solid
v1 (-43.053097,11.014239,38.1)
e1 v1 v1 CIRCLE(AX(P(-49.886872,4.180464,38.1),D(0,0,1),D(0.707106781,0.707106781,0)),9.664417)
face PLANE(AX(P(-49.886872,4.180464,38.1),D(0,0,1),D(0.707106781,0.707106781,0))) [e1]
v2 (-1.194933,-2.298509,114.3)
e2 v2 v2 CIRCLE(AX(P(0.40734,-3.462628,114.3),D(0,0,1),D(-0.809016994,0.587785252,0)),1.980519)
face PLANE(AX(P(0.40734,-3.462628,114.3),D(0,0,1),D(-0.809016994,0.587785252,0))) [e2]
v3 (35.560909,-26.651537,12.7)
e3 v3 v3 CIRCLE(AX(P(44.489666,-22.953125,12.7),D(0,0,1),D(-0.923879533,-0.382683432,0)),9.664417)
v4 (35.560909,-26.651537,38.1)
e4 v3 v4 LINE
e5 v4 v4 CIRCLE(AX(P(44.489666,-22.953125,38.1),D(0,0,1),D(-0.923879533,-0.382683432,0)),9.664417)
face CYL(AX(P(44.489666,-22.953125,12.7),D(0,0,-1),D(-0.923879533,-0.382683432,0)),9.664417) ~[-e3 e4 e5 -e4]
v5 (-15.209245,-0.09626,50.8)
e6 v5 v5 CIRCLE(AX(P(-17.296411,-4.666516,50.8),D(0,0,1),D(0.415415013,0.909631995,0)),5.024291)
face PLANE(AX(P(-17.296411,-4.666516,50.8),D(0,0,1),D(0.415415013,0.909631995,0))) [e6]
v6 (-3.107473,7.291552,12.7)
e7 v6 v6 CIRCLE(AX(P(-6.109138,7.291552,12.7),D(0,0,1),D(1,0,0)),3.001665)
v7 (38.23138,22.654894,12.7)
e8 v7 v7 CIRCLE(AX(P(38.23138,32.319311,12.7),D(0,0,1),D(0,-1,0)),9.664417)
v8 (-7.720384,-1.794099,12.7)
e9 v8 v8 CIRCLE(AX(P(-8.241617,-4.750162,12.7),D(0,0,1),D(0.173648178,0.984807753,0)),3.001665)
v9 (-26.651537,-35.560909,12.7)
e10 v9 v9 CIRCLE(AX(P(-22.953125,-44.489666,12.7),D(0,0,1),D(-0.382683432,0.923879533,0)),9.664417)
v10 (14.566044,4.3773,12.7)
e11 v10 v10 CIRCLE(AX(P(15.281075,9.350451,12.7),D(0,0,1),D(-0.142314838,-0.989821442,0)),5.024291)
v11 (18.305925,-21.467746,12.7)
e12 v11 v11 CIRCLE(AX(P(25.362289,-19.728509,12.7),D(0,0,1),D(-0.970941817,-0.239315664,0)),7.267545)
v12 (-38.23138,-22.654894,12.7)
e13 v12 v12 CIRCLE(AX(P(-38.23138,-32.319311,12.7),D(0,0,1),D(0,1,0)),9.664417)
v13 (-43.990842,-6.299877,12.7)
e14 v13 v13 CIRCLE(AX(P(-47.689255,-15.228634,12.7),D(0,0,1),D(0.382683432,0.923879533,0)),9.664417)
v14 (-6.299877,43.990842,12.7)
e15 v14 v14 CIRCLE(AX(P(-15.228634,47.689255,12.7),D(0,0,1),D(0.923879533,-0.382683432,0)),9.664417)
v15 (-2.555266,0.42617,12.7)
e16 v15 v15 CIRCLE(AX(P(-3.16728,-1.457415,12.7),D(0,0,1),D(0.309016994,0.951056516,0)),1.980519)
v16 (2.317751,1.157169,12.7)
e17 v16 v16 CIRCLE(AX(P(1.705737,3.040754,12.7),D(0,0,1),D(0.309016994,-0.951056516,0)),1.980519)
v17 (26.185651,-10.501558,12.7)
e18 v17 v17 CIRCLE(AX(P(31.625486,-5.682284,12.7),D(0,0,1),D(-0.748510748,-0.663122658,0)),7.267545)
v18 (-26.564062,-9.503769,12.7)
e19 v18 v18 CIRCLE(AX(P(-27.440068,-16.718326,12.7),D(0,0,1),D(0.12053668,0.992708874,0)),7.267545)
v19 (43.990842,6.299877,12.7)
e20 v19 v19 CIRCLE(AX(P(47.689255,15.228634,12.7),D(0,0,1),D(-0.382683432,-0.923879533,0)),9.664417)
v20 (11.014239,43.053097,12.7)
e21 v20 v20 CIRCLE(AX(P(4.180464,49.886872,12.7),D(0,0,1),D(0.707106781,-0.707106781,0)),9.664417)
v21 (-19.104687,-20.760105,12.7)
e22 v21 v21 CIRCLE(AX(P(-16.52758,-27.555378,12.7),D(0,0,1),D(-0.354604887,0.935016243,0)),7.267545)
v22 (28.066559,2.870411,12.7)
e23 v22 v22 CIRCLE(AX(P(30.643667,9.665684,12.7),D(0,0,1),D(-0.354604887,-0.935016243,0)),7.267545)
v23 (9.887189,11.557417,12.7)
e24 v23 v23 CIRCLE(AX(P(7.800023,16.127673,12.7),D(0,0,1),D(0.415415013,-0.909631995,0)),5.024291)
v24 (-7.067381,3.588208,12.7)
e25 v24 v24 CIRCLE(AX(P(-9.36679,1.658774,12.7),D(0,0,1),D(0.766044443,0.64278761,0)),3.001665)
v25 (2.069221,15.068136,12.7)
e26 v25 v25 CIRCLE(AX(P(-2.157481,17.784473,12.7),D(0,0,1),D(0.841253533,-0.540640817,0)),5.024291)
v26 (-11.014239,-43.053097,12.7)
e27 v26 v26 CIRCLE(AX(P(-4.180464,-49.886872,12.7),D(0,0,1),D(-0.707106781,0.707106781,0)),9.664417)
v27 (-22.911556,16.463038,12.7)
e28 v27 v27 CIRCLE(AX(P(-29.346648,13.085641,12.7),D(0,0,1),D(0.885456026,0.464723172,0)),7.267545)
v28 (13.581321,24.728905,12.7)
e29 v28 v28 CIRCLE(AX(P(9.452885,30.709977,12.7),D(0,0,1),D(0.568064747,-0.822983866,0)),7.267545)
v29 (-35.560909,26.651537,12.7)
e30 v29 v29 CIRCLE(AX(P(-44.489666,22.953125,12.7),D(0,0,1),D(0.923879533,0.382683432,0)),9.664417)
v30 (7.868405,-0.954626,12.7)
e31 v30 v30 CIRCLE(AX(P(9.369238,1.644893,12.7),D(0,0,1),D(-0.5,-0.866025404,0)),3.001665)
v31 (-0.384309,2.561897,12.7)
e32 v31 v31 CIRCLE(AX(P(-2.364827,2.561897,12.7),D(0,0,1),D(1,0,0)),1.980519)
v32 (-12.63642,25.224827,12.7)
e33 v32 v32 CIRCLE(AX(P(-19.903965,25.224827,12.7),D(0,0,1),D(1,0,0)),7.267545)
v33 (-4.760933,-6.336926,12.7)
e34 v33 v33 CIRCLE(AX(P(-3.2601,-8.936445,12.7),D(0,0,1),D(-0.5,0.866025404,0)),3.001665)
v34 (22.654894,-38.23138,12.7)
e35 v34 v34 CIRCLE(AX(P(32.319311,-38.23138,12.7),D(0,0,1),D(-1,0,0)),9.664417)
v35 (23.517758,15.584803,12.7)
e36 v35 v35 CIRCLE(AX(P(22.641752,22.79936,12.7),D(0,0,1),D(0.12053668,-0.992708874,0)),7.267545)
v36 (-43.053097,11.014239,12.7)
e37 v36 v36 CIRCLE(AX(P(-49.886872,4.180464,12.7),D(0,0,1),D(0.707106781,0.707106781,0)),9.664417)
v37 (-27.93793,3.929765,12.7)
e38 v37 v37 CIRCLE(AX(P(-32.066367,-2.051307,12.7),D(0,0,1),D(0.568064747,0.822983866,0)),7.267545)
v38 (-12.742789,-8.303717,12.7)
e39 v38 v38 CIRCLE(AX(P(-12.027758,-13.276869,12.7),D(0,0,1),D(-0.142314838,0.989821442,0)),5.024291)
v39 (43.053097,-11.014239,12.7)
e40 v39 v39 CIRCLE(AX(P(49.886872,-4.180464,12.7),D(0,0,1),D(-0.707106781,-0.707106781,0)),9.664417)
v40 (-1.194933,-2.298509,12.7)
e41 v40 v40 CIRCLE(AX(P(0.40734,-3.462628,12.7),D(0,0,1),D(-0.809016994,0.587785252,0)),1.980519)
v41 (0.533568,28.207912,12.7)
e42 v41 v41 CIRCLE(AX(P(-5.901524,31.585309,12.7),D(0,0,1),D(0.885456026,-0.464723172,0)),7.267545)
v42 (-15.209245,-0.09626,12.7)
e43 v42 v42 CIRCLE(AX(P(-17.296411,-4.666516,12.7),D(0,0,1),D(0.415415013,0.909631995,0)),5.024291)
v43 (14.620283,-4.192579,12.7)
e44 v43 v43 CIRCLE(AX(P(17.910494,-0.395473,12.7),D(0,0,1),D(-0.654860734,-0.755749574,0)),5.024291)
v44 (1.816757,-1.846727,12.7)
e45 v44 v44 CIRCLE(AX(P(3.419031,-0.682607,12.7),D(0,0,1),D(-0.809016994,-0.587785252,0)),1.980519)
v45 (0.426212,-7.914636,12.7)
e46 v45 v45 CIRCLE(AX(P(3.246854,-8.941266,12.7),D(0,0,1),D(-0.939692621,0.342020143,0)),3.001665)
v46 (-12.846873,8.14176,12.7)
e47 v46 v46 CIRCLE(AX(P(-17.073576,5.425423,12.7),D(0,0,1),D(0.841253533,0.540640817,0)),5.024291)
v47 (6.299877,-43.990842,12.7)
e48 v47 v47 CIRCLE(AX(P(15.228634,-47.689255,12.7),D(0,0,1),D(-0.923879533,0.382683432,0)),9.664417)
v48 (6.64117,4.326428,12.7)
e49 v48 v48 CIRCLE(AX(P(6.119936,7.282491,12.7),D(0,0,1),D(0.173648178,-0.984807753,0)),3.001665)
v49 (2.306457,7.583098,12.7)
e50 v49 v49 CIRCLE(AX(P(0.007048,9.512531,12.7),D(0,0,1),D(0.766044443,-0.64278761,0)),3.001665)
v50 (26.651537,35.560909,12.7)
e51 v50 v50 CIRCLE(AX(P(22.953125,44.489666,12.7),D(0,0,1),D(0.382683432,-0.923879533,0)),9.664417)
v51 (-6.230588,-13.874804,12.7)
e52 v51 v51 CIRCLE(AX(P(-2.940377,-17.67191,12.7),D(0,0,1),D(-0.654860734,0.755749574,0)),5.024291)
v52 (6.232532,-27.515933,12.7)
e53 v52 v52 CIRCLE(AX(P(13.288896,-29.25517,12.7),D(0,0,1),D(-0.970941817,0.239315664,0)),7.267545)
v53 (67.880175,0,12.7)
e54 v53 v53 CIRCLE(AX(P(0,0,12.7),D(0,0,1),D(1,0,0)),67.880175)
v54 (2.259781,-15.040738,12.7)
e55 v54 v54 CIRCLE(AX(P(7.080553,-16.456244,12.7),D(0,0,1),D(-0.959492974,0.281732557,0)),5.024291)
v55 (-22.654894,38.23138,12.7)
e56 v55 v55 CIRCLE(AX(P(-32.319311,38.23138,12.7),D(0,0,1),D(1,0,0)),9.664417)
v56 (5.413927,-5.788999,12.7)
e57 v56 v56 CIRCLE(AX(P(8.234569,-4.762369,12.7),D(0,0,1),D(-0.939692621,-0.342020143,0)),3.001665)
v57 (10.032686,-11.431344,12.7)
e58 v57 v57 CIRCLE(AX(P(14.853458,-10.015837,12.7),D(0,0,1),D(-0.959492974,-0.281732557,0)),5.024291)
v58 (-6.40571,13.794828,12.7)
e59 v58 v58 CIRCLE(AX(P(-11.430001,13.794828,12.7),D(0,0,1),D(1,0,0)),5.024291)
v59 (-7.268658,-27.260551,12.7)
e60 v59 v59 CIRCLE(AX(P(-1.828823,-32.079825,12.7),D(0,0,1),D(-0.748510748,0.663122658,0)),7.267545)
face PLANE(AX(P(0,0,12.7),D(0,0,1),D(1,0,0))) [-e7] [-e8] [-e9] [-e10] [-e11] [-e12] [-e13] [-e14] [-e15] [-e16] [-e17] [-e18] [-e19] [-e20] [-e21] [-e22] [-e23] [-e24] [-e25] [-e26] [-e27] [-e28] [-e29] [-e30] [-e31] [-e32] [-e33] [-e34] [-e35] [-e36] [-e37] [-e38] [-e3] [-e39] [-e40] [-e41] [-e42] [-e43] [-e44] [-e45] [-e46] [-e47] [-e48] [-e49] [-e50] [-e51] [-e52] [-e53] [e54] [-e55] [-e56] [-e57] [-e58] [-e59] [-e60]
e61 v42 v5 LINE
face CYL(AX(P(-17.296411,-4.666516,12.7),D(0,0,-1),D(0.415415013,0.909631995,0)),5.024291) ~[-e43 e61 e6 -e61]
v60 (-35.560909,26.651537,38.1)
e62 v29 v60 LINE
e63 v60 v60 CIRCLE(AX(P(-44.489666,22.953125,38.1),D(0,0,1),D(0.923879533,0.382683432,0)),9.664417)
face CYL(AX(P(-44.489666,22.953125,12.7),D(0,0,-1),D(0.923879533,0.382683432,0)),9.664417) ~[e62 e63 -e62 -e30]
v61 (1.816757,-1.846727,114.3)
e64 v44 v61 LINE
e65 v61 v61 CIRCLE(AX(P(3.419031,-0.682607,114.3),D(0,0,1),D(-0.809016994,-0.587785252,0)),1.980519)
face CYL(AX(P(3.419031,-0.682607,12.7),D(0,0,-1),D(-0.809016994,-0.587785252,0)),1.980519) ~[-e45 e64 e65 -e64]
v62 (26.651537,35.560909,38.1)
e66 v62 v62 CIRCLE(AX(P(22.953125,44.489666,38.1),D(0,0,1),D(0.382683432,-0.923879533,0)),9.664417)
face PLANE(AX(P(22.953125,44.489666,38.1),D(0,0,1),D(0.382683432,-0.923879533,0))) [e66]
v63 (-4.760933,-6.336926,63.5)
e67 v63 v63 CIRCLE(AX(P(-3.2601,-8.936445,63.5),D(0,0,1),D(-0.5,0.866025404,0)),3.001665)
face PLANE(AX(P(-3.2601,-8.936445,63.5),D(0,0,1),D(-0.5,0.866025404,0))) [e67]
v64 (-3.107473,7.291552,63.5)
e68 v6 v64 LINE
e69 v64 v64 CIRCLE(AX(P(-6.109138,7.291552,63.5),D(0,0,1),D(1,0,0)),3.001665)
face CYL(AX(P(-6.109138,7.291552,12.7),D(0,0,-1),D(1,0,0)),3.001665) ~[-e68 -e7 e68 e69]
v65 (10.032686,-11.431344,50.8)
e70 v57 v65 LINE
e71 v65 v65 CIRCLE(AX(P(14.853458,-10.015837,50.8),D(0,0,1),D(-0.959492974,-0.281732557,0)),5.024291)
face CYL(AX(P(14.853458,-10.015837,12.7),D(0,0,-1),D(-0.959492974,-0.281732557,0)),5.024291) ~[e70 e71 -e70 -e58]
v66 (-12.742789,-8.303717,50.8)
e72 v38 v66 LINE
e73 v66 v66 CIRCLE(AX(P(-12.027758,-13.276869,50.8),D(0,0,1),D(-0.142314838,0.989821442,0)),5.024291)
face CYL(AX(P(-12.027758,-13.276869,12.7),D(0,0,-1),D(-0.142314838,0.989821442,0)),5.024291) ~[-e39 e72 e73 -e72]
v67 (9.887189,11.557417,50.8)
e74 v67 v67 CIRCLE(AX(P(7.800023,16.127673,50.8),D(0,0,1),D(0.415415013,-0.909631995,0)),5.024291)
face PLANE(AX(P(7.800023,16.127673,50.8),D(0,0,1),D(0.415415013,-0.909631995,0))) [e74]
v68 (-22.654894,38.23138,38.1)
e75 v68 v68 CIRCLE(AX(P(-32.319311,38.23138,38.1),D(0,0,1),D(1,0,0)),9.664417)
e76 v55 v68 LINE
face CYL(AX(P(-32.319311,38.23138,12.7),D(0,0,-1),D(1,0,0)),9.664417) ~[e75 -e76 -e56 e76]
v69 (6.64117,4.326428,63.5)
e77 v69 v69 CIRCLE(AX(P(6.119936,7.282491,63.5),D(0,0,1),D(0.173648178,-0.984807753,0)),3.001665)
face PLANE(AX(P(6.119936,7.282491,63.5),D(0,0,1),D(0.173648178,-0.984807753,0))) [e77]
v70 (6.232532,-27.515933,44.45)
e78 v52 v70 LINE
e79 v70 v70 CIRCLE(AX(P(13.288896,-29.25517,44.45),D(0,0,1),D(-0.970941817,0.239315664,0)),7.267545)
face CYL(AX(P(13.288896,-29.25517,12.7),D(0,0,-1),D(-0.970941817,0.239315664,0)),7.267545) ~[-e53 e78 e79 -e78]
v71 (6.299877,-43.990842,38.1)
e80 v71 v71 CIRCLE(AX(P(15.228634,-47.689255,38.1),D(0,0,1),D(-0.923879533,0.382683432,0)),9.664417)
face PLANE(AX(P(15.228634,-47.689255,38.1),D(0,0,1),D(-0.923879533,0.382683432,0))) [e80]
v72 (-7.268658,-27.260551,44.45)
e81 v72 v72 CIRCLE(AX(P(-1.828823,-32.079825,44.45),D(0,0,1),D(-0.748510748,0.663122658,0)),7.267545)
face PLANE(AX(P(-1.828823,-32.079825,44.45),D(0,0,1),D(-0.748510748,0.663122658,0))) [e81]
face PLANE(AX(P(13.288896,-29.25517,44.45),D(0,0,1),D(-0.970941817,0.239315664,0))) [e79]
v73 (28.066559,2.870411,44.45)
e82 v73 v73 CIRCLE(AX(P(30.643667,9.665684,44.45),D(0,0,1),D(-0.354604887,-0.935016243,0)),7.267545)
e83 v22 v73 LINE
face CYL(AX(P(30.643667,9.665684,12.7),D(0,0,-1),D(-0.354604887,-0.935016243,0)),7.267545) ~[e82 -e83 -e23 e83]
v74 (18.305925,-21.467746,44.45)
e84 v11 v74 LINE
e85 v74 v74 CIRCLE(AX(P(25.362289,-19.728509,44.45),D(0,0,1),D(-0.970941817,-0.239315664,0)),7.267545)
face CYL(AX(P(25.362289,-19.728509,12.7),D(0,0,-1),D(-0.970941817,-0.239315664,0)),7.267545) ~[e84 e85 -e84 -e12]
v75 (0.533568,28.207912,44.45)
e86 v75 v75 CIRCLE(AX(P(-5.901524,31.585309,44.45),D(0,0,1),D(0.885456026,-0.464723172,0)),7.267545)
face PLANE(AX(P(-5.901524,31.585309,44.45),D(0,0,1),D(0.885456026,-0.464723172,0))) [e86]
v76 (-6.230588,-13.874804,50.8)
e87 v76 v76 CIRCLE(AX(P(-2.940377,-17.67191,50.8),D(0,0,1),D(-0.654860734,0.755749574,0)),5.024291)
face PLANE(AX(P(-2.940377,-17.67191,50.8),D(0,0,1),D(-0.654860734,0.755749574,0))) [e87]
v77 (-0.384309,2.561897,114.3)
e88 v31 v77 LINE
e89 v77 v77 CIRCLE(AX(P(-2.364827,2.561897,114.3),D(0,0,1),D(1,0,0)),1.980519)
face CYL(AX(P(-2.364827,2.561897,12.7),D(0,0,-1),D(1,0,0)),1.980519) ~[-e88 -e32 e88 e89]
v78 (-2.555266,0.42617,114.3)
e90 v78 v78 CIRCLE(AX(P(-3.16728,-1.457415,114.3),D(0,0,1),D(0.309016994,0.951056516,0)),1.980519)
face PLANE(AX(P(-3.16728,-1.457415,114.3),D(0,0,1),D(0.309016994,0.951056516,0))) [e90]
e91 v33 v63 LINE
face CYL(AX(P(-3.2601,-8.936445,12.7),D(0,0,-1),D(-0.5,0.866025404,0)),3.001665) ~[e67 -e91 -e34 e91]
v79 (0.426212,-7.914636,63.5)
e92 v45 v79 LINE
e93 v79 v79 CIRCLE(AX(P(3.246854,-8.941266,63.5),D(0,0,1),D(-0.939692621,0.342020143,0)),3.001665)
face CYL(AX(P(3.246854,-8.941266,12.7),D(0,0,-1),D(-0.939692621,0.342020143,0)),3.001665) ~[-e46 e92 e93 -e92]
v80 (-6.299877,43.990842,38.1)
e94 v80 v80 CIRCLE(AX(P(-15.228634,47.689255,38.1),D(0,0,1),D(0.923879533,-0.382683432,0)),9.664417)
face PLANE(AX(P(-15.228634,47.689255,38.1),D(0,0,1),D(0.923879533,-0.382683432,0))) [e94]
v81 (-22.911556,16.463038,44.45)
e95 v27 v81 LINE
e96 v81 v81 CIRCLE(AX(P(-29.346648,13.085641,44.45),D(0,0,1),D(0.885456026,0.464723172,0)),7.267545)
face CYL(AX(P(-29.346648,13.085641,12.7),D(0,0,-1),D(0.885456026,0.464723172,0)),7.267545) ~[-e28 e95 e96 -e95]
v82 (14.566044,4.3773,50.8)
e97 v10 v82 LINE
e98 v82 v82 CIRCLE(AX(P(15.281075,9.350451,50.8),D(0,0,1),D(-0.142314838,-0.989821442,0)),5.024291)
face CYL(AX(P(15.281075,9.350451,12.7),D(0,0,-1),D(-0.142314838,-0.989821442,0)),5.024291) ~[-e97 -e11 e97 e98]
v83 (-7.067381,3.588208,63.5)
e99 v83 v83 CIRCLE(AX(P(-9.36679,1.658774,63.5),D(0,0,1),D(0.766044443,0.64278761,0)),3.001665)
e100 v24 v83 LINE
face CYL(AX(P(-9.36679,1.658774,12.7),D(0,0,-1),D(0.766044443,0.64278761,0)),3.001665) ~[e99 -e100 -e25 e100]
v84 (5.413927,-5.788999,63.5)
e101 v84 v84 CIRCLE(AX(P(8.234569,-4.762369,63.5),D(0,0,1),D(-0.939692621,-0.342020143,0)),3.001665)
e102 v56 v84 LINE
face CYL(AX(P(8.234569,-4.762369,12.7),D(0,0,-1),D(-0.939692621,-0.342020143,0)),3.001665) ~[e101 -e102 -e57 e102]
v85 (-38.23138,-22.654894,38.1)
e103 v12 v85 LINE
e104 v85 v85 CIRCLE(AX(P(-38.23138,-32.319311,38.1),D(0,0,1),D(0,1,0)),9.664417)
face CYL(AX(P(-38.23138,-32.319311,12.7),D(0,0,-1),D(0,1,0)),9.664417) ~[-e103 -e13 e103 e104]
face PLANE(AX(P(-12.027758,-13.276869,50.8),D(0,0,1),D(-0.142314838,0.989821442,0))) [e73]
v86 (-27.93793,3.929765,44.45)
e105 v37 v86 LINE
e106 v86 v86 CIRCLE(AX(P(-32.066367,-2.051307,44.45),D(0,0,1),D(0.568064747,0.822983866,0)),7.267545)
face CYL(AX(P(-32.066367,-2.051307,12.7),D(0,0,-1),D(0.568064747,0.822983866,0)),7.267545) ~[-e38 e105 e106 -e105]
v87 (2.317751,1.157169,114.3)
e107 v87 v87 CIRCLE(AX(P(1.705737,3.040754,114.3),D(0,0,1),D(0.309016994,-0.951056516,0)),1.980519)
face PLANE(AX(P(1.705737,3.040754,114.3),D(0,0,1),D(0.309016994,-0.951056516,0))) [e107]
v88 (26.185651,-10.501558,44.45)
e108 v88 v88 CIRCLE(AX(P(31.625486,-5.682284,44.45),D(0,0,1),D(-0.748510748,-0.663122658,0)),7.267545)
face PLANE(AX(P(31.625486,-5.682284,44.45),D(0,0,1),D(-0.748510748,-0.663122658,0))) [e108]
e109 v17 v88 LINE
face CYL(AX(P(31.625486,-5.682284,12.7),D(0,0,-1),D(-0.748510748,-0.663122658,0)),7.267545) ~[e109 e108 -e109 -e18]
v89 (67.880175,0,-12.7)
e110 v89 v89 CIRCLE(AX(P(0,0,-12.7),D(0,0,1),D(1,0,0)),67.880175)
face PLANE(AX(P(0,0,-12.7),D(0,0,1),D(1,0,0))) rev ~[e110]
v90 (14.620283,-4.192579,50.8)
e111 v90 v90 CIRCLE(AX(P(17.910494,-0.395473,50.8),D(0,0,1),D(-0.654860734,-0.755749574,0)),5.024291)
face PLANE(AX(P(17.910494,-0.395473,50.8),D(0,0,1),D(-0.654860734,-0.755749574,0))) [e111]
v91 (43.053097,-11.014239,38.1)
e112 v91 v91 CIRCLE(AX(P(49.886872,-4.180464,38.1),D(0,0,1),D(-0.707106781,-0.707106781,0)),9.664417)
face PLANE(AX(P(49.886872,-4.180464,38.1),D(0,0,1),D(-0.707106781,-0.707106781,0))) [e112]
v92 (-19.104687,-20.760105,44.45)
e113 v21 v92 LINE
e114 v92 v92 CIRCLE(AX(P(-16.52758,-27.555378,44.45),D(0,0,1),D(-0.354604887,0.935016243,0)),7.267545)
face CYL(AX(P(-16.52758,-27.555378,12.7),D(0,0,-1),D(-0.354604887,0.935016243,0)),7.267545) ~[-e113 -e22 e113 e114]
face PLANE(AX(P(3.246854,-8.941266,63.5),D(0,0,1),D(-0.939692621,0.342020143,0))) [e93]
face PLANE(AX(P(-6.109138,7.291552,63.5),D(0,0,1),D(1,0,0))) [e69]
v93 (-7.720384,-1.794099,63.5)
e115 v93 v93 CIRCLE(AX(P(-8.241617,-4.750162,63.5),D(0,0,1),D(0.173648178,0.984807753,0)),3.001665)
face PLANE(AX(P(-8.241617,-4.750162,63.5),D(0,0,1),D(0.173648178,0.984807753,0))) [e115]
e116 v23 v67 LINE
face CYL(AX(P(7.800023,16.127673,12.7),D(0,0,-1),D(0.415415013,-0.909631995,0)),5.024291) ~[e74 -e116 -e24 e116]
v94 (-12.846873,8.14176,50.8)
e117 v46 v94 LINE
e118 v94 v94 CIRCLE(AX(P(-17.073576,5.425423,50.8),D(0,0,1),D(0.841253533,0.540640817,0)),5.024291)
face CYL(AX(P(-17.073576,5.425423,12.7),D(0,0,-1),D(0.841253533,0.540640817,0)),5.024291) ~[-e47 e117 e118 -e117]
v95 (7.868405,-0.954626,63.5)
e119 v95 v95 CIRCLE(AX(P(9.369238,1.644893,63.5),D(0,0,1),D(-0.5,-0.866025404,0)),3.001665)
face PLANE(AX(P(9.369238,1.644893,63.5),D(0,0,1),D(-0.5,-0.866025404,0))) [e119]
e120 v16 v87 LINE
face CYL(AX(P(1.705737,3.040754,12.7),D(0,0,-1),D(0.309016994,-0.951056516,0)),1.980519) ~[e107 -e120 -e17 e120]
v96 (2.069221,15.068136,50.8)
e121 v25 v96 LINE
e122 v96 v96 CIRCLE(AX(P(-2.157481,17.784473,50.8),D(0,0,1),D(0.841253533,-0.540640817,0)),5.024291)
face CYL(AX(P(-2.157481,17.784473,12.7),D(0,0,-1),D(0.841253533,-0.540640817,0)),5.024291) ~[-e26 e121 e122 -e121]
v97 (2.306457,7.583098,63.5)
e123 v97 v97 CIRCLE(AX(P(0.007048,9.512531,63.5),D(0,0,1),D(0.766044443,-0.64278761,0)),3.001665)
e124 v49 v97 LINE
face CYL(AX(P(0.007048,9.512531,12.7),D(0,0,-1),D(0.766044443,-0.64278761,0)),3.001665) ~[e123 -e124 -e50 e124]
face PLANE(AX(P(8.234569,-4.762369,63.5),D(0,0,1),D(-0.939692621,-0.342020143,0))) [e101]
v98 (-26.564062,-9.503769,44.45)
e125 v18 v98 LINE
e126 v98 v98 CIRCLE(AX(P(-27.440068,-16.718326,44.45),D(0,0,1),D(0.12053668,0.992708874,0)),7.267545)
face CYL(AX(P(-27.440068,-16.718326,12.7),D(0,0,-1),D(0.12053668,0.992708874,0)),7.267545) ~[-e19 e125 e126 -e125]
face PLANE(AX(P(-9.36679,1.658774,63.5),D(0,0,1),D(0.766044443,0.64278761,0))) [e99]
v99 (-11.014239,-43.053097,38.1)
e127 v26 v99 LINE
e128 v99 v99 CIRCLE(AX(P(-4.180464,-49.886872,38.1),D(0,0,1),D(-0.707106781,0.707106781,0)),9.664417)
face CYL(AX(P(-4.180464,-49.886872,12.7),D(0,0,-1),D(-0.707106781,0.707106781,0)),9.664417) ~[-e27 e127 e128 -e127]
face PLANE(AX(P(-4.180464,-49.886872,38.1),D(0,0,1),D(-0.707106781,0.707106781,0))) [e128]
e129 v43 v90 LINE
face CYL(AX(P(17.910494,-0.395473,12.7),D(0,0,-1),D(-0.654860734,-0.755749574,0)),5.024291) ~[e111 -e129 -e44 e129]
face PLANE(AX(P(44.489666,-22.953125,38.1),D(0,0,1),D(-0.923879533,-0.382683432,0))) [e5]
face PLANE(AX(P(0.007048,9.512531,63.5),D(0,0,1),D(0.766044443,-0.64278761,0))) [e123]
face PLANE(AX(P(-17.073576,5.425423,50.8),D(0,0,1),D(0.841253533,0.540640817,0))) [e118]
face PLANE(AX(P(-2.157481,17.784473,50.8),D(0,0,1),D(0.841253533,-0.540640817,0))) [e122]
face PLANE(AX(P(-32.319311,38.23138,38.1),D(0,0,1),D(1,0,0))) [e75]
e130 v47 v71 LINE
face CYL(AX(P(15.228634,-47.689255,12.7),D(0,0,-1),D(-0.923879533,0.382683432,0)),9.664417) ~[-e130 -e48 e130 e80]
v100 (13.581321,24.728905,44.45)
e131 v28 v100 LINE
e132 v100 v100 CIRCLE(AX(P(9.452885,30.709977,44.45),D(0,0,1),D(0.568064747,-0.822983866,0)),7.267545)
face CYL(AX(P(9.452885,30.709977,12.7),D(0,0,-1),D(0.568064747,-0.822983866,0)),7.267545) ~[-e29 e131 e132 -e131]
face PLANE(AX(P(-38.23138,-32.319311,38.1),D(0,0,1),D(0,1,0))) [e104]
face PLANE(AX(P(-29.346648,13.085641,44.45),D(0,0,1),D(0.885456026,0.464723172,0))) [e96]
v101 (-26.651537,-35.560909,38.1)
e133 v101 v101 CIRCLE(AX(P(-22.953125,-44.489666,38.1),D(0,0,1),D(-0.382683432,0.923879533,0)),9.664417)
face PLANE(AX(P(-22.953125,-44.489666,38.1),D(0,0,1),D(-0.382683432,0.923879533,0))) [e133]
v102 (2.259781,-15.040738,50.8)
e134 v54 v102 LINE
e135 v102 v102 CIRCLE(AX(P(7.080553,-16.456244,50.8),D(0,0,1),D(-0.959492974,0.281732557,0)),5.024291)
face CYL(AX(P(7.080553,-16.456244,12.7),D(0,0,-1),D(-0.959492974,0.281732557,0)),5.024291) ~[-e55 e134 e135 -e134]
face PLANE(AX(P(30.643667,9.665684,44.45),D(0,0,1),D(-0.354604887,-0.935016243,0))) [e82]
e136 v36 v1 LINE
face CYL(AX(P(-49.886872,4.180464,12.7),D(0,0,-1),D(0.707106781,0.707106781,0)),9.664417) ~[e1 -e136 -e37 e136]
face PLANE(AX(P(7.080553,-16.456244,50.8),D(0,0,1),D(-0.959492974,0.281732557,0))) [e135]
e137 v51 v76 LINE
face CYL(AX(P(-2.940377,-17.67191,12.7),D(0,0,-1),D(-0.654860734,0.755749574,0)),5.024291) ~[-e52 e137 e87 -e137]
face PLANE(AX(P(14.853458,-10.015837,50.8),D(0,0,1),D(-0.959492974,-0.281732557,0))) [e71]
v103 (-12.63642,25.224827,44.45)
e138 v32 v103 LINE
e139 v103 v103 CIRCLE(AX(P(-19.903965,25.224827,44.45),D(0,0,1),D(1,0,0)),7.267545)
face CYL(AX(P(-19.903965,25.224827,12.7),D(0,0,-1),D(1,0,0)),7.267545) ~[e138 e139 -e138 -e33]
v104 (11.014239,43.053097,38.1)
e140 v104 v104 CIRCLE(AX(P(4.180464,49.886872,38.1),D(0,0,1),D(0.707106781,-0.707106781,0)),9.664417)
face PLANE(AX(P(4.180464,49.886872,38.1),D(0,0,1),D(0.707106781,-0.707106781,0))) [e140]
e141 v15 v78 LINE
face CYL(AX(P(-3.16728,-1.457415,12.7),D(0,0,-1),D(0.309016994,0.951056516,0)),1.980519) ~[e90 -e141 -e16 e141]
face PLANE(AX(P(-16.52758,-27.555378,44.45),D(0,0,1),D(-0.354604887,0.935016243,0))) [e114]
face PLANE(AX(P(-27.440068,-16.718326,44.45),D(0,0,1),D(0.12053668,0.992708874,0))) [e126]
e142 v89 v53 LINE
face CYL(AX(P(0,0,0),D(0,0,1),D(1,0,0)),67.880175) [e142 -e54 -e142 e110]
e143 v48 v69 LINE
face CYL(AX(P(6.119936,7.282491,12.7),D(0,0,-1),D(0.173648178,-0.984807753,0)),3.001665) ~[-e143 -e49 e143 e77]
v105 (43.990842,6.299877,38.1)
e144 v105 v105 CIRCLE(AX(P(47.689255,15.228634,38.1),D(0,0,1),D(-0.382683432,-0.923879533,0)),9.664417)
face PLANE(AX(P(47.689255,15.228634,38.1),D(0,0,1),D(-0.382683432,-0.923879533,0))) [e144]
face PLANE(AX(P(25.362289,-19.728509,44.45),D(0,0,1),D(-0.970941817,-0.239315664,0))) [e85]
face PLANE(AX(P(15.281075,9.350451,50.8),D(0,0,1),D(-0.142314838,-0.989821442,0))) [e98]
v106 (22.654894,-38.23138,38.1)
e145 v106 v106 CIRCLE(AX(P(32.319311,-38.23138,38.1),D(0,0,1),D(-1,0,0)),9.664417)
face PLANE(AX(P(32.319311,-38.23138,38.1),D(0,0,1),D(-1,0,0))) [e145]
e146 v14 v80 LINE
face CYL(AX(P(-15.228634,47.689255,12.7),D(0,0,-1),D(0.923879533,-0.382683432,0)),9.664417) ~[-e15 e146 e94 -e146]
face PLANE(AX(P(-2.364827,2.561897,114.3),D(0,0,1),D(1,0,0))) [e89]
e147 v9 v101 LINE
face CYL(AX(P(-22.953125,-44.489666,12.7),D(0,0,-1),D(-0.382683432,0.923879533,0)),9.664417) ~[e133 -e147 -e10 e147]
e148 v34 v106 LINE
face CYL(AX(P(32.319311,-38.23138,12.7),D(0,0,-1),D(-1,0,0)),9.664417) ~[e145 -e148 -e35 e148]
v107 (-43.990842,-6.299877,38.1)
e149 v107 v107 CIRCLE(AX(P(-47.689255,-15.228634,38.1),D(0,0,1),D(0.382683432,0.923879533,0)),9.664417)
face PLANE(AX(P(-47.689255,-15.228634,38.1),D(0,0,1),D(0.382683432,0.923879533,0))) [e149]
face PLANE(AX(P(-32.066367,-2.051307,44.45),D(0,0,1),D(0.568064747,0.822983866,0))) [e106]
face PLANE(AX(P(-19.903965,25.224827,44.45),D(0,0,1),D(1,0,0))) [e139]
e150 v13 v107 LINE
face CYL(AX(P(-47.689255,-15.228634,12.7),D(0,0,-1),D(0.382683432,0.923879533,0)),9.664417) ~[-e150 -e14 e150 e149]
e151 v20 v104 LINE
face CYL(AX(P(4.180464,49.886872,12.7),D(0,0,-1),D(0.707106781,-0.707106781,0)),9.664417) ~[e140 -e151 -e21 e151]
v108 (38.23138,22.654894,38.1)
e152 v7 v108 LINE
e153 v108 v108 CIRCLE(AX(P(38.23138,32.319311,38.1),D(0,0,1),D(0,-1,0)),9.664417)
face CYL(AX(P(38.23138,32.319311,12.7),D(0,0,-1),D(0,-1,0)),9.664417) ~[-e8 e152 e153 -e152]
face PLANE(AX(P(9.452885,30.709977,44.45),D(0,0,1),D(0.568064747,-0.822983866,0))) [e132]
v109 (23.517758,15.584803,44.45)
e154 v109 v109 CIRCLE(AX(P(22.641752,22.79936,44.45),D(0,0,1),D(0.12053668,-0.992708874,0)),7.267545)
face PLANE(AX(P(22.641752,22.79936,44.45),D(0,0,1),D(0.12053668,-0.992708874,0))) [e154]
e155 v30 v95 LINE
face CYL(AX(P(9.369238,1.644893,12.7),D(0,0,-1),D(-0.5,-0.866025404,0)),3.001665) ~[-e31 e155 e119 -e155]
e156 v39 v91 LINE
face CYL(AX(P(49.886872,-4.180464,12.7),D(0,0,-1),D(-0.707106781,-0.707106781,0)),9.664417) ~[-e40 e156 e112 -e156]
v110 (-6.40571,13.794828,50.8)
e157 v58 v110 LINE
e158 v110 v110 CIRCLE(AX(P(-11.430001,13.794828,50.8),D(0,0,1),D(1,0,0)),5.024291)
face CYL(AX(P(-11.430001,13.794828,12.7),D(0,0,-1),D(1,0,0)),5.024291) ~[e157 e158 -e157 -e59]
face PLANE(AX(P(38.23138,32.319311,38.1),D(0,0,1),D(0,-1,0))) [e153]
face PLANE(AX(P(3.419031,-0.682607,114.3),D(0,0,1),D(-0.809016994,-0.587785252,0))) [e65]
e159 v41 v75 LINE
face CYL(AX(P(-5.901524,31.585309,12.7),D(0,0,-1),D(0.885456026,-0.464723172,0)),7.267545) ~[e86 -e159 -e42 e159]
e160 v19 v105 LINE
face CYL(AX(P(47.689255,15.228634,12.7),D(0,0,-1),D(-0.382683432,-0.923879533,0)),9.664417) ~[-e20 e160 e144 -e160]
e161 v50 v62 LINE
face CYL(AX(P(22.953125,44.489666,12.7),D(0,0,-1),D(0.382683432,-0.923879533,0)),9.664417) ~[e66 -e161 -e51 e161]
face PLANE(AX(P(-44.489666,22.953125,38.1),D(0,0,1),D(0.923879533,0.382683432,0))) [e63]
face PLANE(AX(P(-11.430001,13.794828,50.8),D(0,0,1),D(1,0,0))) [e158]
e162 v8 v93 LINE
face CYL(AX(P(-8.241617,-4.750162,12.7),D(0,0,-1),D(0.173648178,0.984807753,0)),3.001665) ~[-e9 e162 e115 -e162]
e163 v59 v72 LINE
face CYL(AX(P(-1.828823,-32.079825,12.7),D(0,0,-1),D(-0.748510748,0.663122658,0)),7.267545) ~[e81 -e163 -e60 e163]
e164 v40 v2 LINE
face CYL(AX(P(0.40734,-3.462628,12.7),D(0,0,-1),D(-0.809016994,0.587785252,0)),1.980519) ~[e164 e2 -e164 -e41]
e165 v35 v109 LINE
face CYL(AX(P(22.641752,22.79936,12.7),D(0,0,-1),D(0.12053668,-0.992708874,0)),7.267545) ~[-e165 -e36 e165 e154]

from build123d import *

# Parameters (mm, degrees)
F0_R             = 67.8801752346
F1_DEPTH         = 12.7
F2_R             = 9.6644171041
F3_DEPTH         = 25.4
F3_COPIES_COUNT  = 16
F4_R             = 7.2675454898
F5_DEPTH         = 31.75
F5_COPIES_COUNT  = 13
F6_R             = 5.0242913047
F7_DEPTH         = 38.1
F7_COPIES_COUNT  = 11
F8_R             = 3.0016652879
F9_DEPTH         = 50.8
F9_COPIES_COUNT  = 9
F10_R            = 1.9805186859
F11_DEPTH        = 101.6
F11_COPIES_COUNT = 5


# Not quite as in the source:
# - a pattern or mirror of a feature is missing from the dataset's text; its kind, count and spacing are read off the source's solid


with BuildPart() as f1:
    # F0 (on Top) → F1 (new body, symmetric)
    with BuildSketch(Plane.XY):
        Circle(F0_R)
    extrude(amount=F1_DEPTH, both=True)

    # F2 (on face) → F3 (join)
    with BuildSketch(Plane.XY.offset(12.7)):
        with Locations((-32.3193110526, 38.2313802838)):
            Circle(F2_R)
    f3 = extrude(amount=F3_DEPTH)

    # F3_copies: F3 ×16 about axis
    f3_copies_axis = Axis((0, 0, 0), (0, 0, 1))
    for i in range(1, F3_COPIES_COUNT):
        add(f3.rotate(f3_copies_axis, i * 360 / F3_COPIES_COUNT))

    # F4 (on face) → F5 (join)
    with BuildSketch(Plane.XY.offset(12.7)):
        with Locations((-19.9039652944, 25.22482723)):
            Circle(F4_R)
    f5 = extrude(amount=F5_DEPTH)

    # F5_copies: F5 ×13 about axis
    f5_copies_axis = Axis((0, 0, 0), (0, 0, 1))
    for i in range(1, F5_COPIES_COUNT):
        add(f5.rotate(f5_copies_axis, i * 360 / F5_COPIES_COUNT))

    # F6 (on face) → F7 (join)
    with BuildSketch(Plane.XY.offset(12.7)):
        with Locations((-11.4300008863, 13.7948282063)):
            Circle(F6_R)
    f7 = extrude(amount=F7_DEPTH)

    # F7_copies: F7 ×11 about axis
    f7_copies_axis = Axis((0, 0, 0), (0, 0, 1))
    for i in range(1, F7_COPIES_COUNT):
        add(f7.rotate(f7_copies_axis, i * 360 / F7_COPIES_COUNT))

    # F8 (on face) → F9 (join)
    with BuildSketch(Plane.XY.offset(12.7)):
        with Locations((-6.1091380194, 7.2915516794)):
            Circle(F8_R)
    f9 = extrude(amount=F9_DEPTH)

    # F9_copies: F9 ×9 about axis
    f9_copies_axis = Axis((0, 0, 0), (0, 0, 1))
    for i in range(1, F9_COPIES_COUNT):
        add(f9.rotate(f9_copies_axis, i * 360 / F9_COPIES_COUNT))

    # F10 (on face) → F11 (join)
    with BuildSketch(Plane.XY.offset(12.7)):
        with Locations((-2.36482732, 2.5618965738)):
            Circle(F10_R)
    f11 = extrude(amount=F11_DEPTH)

    # F11_copies: F11 ×5 about axis
    f11_copies_axis = Axis((0, 0, 0), (0, 0, 1))
    for i in range(1, F11_COPIES_COUNT):
        add(f11.rotate(f11_copies_axis, i * 360 / F11_COPIES_COUNT))


solid = f1.part
